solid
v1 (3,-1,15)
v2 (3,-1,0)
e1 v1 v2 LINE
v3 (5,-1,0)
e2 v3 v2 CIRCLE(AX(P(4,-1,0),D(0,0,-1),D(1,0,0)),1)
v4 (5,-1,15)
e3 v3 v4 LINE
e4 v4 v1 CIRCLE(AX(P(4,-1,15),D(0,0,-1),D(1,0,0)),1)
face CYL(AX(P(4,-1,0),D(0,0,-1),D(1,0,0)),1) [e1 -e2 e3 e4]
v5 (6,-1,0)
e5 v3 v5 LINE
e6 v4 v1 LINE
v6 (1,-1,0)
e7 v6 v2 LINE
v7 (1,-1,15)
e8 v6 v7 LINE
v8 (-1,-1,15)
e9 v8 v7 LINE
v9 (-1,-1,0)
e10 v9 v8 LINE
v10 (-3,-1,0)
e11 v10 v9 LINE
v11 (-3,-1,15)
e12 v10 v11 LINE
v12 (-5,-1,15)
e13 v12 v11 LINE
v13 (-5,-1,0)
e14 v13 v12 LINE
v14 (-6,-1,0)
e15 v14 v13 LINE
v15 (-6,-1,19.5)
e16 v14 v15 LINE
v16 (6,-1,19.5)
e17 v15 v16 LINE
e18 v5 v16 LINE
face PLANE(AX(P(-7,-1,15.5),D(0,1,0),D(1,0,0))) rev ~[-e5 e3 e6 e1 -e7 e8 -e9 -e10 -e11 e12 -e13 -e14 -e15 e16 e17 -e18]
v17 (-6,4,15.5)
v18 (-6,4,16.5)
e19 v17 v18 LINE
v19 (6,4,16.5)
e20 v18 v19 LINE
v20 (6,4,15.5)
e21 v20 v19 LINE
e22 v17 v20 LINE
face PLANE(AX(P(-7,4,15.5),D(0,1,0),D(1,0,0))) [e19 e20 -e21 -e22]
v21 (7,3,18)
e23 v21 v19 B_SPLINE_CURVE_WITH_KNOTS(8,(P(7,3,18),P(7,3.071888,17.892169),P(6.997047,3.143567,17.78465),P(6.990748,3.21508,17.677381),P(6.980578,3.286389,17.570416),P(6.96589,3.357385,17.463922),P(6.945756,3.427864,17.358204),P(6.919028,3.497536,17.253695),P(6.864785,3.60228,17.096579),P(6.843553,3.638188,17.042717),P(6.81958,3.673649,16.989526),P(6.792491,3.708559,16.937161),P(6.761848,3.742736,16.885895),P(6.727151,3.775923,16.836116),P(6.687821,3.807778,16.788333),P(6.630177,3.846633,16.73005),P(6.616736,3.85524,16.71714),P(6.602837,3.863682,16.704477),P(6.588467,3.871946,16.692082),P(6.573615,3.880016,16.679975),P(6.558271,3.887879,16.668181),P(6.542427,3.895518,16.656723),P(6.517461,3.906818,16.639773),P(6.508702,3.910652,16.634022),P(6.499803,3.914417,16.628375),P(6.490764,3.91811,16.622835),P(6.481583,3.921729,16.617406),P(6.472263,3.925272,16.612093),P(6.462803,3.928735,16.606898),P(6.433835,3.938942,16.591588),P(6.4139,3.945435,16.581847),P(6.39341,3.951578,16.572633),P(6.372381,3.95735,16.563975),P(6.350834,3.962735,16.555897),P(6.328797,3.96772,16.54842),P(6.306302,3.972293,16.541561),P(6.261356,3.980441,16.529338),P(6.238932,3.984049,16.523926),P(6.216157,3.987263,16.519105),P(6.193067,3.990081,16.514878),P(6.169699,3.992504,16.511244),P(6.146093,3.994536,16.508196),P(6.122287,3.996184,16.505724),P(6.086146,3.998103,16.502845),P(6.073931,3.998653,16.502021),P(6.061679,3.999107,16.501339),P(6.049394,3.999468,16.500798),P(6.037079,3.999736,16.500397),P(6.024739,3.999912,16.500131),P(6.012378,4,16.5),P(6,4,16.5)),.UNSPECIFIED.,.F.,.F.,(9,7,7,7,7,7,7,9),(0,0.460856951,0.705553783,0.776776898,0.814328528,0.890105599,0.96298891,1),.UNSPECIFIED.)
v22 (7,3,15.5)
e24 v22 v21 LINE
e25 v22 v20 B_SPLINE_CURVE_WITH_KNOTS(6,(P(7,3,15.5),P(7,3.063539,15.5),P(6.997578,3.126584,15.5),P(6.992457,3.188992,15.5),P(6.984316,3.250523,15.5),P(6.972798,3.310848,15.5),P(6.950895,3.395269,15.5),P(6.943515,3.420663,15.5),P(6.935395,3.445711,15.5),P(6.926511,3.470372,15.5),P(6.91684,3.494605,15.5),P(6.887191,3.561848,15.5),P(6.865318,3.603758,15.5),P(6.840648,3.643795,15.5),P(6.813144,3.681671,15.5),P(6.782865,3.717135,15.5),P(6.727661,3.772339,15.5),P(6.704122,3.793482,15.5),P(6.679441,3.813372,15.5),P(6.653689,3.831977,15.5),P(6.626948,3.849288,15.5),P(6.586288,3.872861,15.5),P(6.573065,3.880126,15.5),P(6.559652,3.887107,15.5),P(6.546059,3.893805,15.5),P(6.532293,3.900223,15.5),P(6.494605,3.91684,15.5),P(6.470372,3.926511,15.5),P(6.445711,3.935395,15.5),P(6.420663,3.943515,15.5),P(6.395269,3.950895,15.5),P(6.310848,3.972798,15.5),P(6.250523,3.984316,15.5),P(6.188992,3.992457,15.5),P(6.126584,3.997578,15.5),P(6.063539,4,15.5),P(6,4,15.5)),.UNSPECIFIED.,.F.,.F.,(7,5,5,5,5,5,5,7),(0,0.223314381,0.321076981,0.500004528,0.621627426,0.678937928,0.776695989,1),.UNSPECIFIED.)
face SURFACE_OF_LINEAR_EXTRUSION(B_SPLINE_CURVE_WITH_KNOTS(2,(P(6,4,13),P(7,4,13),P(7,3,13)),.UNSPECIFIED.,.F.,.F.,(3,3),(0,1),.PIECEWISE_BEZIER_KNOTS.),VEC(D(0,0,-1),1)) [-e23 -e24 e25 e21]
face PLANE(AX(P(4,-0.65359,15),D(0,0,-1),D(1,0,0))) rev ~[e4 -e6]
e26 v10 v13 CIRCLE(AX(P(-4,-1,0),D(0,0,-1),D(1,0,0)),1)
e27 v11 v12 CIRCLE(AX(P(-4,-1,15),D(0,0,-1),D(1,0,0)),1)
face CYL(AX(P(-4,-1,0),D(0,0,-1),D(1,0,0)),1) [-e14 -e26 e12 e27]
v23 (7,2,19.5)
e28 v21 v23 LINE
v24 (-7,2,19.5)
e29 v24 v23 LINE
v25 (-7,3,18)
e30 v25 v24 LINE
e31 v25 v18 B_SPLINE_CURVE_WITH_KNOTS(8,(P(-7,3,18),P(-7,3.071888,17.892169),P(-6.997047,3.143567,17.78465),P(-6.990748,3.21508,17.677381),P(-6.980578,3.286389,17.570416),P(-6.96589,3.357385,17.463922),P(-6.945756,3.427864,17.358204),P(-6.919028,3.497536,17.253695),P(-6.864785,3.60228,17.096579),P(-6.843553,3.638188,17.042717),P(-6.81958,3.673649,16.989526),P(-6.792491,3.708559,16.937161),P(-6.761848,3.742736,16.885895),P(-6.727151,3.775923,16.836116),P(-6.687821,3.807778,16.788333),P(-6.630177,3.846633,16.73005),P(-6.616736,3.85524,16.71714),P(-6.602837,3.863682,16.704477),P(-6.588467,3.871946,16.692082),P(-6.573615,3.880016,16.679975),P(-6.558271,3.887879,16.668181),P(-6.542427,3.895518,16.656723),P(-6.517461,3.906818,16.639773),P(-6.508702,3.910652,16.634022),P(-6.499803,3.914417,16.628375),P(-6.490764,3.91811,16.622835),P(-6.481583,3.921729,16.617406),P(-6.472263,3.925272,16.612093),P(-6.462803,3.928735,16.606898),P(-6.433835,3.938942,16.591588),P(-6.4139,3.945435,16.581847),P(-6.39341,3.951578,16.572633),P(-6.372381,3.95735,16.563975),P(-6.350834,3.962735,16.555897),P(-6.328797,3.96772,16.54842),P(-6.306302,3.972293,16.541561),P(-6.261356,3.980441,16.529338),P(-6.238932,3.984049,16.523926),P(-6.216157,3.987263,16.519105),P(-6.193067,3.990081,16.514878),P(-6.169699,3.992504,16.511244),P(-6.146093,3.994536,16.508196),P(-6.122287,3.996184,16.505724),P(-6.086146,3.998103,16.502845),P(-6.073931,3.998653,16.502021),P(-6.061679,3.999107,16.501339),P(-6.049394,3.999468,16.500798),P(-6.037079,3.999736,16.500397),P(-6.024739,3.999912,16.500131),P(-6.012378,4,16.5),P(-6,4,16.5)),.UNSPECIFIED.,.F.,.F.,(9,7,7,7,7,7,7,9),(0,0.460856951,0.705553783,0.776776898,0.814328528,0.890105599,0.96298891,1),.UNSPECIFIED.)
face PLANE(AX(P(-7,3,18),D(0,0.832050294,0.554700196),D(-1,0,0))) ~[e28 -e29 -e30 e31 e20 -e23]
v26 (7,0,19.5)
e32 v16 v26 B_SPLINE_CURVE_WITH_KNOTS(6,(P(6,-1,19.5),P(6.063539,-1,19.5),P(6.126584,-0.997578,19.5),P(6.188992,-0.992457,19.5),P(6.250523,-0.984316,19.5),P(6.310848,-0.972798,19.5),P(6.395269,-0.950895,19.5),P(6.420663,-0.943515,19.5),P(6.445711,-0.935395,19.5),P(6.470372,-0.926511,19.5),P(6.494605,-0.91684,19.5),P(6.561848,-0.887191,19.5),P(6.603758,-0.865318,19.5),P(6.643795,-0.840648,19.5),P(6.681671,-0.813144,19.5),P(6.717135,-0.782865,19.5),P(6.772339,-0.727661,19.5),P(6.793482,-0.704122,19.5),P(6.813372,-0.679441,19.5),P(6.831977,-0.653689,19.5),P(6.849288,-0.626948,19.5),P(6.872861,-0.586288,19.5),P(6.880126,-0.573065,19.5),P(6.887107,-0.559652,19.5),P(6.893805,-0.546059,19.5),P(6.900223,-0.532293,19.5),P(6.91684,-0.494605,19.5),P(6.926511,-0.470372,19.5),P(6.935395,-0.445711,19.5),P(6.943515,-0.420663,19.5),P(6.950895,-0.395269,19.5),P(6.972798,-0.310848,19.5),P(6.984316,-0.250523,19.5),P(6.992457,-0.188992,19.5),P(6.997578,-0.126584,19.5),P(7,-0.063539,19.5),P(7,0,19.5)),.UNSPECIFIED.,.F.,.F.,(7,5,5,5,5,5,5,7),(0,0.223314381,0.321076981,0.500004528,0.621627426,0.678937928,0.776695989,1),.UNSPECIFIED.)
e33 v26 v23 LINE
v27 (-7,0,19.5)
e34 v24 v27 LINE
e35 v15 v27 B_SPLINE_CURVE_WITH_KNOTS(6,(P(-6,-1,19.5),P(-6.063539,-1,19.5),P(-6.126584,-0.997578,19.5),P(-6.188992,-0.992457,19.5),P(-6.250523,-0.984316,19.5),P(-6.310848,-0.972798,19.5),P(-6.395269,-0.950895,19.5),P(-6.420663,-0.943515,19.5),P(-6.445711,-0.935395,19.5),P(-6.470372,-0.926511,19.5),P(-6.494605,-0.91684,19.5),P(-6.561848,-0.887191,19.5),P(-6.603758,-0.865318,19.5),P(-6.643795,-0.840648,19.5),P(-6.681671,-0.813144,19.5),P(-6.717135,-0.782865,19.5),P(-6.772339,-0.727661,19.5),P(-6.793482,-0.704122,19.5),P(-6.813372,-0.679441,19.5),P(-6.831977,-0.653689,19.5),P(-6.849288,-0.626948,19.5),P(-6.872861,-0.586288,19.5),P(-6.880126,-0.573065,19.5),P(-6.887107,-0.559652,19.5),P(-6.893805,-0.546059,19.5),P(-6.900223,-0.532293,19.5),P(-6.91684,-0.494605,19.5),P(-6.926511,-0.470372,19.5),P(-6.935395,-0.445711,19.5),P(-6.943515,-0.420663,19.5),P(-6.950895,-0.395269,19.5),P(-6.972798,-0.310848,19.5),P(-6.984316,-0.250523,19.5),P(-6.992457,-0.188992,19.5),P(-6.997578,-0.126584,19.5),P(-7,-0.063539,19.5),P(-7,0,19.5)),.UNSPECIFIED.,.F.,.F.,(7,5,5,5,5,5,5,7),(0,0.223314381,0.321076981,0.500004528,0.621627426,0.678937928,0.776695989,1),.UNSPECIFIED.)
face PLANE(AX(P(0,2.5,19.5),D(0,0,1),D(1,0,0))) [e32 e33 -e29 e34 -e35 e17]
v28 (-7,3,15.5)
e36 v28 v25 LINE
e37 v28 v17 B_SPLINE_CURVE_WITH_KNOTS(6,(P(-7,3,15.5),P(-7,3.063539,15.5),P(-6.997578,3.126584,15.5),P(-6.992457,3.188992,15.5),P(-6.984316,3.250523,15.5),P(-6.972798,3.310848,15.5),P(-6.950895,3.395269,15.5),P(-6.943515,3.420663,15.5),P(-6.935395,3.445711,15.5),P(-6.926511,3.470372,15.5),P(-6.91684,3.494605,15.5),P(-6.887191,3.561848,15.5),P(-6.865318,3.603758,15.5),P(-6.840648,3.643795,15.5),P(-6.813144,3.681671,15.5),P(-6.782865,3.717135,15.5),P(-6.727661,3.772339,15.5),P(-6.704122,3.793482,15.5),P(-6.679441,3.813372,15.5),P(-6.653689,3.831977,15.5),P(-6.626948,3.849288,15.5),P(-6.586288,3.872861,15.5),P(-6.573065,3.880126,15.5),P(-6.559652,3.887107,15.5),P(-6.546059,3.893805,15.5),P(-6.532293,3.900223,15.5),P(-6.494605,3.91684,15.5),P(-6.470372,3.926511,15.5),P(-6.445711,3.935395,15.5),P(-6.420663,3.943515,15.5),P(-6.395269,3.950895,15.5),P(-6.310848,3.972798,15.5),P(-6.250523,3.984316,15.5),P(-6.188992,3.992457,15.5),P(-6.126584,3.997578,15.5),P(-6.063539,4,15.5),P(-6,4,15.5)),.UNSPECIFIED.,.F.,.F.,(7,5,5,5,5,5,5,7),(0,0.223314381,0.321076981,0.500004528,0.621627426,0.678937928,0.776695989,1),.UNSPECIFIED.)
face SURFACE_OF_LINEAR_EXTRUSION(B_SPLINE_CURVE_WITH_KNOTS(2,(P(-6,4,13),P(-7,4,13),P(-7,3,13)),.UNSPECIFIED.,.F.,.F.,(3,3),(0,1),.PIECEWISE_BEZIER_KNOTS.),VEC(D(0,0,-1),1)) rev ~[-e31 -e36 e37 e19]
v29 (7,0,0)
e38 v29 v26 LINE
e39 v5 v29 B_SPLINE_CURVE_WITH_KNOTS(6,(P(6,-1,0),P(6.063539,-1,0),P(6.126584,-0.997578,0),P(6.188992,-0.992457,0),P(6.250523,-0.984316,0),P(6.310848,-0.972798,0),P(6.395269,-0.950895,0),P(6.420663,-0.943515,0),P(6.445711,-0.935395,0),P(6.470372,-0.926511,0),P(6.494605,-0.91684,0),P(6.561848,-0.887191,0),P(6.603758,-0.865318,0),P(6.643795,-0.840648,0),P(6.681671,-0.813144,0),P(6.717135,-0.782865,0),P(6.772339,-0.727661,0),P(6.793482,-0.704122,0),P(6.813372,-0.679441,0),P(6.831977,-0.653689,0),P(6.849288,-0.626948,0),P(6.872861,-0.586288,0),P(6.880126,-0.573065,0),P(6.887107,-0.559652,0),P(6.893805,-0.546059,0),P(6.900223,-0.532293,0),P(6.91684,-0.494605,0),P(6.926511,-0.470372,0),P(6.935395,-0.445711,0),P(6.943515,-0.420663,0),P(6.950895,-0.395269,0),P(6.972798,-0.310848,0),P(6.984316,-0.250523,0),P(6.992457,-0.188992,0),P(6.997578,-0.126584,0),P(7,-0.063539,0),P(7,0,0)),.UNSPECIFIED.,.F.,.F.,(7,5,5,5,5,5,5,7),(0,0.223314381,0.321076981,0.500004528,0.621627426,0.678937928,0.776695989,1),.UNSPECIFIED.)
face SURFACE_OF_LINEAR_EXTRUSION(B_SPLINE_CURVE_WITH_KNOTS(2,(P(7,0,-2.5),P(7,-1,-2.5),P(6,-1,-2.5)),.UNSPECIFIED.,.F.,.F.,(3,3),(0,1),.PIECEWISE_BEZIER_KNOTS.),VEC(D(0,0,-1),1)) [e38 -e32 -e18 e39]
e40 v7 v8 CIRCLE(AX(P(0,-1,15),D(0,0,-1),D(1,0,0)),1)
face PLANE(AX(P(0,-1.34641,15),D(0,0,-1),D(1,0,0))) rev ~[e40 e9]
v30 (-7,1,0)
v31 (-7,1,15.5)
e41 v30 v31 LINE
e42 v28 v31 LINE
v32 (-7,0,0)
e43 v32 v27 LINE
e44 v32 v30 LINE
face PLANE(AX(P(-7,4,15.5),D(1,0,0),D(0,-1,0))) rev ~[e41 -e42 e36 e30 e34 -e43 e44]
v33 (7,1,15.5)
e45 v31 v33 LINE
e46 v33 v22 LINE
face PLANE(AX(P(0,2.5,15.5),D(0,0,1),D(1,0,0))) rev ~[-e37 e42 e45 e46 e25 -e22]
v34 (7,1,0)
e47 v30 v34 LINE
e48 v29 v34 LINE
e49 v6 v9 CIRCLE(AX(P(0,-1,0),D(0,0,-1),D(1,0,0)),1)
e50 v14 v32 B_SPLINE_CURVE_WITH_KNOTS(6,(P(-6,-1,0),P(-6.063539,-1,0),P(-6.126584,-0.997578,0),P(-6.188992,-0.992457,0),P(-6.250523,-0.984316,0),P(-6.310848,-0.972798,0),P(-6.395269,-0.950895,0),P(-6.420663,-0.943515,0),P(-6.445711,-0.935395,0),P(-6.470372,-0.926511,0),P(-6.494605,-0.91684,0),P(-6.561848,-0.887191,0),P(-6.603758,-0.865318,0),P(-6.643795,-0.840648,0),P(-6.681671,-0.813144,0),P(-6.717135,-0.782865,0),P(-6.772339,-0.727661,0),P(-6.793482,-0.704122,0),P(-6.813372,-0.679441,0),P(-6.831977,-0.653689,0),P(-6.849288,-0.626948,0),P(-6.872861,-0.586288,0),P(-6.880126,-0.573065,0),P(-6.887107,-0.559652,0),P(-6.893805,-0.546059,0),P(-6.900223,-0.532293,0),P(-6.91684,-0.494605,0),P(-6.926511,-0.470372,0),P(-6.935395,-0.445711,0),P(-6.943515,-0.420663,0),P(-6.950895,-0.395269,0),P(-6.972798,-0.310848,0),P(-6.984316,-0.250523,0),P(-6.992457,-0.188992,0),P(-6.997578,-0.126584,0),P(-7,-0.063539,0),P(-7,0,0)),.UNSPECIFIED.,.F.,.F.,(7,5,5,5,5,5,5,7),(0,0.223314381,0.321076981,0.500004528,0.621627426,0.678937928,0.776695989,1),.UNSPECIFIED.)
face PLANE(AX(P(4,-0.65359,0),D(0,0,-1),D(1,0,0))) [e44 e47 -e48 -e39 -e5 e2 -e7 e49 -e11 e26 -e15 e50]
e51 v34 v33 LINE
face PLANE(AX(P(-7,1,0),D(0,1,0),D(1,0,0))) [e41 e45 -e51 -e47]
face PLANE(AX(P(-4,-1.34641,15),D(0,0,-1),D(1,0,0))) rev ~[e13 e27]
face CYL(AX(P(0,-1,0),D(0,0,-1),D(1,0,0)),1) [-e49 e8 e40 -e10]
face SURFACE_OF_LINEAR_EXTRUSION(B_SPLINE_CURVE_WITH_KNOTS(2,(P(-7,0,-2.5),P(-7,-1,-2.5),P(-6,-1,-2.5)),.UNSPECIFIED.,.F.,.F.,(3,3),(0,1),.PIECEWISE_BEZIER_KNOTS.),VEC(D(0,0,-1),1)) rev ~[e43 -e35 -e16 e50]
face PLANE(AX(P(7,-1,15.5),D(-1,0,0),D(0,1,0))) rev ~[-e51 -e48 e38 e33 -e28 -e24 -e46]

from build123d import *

# Parameters (mm, degrees)
F0_W        = 14
F0_H        = 2
F1_DEPTH    = 15.5
F2_W        = 14
F2_H        = 3
F2_H_2      = 2
F3_DEPTH    = 4
F4_SIZE2    = 2
F4_SIZE     = 3
F5_T1_DEPTH = 24.5
F5_T3_DEPTH = 6
F7_DEPTH    = 15


# Not quite as in the source:
# - a fillet or chamfer that OpenCascade refuses, or shapes differently, is made with other operations: its cross-section is extruded or revolved along the edge and cut away or added


with BuildPart() as f1:
    # F0 (on Top) → F1 (new body)
    with BuildSketch(Plane.XY):
        Rectangle(F0_W, F0_H)
    extrude(amount=F1_DEPTH)

    # F2 (on face) → F3 (join)
    with BuildSketch(Plane.XY.offset(15.5)):
        with Locations((0, 2.5)):
            Rectangle(F2_W, F2_H)
        Rectangle(F2_W, F2_H_2)
    extrude(amount=F3_DEPTH)

    # F4
    f4_edges = [f1.edges().sort_by_distance(p)[0] for p in [
        (0, 4, 19.5),
    ]]
    f4_side = f1.faces().sort_by_distance((0, 4, 17.5))[0]
    chamfer(f4_edges, length=F4_SIZE, length2=F4_SIZE2, reference=f4_side)

    # F5: fillet of radius 1 on 4 edges, made by hand

    # F5_s2 → F5_t1 (cut)
    with BuildSketch(Plane.XY.offset(-2.5)):
        with BuildLine():
            add(Edge.make_bspline(
                [(-7, 0), (-7, -1), (-6, -1)],
                knots=[0, 0, 0, 1, 1, 1], degree=2, weights=[1, 1, 1]))
            Line((-6, -1), (-7, -1))
            Line((-7, -1), (-7, 0))
        make_face()
        with BuildLine():
            add(Edge.make_bspline(
                [(7, 0), (7, -1), (6, -1)],
                knots=[0, 0, 0, 1, 1, 1], degree=2, weights=[1, 1, 1]))
            Line((6, -1), (7, -1))
            Line((7, -1), (7, 0))
        make_face()
    extrude(amount=F5_T1_DEPTH, mode=Mode.SUBTRACT)

    # F5_s4 → F5_t3 (cut)
    with BuildSketch(Plane.XY.offset(13)):
        with BuildLine():
            add(Edge.make_bspline(
                [(-6, 4), (-7, 4), (-7, 3)],
                knots=[0, 0, 0, 1, 1, 1], degree=2, weights=[1, 1, 1]))
            Line((-7, 3), (-7, 4))
            Line((-7, 4), (-6, 4))
        make_face()
        with BuildLine():
            add(Edge.make_bspline(
                [(6, 4), (7, 4), (7, 3)],
                knots=[0, 0, 0, 1, 1, 1], degree=2, weights=[1, 1, 1]))
            Line((7, 3), (7, 4))
            Line((7, 4), (6, 4))
        make_face()
    extrude(amount=F5_T3_DEPTH, mode=Mode.SUBTRACT)

    # F6 (on face) → F7 (join)
    with BuildSketch(Plane(origin=(0, 0, 0), x_dir=(1, 0, 0), z_dir=(0, 0, -1))):
        with BuildLine():
            Line((-1, 1), (1, 1))
            ThreePointArc((1, 1), (0, 2), (-1, 1))
        make_face()
        with BuildLine():
            Line((5, 1), (3, 1))
            ThreePointArc((3, 1), (4, 0), (5, 1))
        make_face()
        with BuildLine():
            ThreePointArc((5, 1), (4, 2), (3, 1))
            Line((3, 1), (5, 1))
        make_face()
        with BuildLine():
            Line((-5, 1), (-3, 1))
            ThreePointArc((-3, 1), (-4, 2), (-5, 1))
        make_face()
    extrude(amount=-F7_DEPTH)


solid = f1.part
